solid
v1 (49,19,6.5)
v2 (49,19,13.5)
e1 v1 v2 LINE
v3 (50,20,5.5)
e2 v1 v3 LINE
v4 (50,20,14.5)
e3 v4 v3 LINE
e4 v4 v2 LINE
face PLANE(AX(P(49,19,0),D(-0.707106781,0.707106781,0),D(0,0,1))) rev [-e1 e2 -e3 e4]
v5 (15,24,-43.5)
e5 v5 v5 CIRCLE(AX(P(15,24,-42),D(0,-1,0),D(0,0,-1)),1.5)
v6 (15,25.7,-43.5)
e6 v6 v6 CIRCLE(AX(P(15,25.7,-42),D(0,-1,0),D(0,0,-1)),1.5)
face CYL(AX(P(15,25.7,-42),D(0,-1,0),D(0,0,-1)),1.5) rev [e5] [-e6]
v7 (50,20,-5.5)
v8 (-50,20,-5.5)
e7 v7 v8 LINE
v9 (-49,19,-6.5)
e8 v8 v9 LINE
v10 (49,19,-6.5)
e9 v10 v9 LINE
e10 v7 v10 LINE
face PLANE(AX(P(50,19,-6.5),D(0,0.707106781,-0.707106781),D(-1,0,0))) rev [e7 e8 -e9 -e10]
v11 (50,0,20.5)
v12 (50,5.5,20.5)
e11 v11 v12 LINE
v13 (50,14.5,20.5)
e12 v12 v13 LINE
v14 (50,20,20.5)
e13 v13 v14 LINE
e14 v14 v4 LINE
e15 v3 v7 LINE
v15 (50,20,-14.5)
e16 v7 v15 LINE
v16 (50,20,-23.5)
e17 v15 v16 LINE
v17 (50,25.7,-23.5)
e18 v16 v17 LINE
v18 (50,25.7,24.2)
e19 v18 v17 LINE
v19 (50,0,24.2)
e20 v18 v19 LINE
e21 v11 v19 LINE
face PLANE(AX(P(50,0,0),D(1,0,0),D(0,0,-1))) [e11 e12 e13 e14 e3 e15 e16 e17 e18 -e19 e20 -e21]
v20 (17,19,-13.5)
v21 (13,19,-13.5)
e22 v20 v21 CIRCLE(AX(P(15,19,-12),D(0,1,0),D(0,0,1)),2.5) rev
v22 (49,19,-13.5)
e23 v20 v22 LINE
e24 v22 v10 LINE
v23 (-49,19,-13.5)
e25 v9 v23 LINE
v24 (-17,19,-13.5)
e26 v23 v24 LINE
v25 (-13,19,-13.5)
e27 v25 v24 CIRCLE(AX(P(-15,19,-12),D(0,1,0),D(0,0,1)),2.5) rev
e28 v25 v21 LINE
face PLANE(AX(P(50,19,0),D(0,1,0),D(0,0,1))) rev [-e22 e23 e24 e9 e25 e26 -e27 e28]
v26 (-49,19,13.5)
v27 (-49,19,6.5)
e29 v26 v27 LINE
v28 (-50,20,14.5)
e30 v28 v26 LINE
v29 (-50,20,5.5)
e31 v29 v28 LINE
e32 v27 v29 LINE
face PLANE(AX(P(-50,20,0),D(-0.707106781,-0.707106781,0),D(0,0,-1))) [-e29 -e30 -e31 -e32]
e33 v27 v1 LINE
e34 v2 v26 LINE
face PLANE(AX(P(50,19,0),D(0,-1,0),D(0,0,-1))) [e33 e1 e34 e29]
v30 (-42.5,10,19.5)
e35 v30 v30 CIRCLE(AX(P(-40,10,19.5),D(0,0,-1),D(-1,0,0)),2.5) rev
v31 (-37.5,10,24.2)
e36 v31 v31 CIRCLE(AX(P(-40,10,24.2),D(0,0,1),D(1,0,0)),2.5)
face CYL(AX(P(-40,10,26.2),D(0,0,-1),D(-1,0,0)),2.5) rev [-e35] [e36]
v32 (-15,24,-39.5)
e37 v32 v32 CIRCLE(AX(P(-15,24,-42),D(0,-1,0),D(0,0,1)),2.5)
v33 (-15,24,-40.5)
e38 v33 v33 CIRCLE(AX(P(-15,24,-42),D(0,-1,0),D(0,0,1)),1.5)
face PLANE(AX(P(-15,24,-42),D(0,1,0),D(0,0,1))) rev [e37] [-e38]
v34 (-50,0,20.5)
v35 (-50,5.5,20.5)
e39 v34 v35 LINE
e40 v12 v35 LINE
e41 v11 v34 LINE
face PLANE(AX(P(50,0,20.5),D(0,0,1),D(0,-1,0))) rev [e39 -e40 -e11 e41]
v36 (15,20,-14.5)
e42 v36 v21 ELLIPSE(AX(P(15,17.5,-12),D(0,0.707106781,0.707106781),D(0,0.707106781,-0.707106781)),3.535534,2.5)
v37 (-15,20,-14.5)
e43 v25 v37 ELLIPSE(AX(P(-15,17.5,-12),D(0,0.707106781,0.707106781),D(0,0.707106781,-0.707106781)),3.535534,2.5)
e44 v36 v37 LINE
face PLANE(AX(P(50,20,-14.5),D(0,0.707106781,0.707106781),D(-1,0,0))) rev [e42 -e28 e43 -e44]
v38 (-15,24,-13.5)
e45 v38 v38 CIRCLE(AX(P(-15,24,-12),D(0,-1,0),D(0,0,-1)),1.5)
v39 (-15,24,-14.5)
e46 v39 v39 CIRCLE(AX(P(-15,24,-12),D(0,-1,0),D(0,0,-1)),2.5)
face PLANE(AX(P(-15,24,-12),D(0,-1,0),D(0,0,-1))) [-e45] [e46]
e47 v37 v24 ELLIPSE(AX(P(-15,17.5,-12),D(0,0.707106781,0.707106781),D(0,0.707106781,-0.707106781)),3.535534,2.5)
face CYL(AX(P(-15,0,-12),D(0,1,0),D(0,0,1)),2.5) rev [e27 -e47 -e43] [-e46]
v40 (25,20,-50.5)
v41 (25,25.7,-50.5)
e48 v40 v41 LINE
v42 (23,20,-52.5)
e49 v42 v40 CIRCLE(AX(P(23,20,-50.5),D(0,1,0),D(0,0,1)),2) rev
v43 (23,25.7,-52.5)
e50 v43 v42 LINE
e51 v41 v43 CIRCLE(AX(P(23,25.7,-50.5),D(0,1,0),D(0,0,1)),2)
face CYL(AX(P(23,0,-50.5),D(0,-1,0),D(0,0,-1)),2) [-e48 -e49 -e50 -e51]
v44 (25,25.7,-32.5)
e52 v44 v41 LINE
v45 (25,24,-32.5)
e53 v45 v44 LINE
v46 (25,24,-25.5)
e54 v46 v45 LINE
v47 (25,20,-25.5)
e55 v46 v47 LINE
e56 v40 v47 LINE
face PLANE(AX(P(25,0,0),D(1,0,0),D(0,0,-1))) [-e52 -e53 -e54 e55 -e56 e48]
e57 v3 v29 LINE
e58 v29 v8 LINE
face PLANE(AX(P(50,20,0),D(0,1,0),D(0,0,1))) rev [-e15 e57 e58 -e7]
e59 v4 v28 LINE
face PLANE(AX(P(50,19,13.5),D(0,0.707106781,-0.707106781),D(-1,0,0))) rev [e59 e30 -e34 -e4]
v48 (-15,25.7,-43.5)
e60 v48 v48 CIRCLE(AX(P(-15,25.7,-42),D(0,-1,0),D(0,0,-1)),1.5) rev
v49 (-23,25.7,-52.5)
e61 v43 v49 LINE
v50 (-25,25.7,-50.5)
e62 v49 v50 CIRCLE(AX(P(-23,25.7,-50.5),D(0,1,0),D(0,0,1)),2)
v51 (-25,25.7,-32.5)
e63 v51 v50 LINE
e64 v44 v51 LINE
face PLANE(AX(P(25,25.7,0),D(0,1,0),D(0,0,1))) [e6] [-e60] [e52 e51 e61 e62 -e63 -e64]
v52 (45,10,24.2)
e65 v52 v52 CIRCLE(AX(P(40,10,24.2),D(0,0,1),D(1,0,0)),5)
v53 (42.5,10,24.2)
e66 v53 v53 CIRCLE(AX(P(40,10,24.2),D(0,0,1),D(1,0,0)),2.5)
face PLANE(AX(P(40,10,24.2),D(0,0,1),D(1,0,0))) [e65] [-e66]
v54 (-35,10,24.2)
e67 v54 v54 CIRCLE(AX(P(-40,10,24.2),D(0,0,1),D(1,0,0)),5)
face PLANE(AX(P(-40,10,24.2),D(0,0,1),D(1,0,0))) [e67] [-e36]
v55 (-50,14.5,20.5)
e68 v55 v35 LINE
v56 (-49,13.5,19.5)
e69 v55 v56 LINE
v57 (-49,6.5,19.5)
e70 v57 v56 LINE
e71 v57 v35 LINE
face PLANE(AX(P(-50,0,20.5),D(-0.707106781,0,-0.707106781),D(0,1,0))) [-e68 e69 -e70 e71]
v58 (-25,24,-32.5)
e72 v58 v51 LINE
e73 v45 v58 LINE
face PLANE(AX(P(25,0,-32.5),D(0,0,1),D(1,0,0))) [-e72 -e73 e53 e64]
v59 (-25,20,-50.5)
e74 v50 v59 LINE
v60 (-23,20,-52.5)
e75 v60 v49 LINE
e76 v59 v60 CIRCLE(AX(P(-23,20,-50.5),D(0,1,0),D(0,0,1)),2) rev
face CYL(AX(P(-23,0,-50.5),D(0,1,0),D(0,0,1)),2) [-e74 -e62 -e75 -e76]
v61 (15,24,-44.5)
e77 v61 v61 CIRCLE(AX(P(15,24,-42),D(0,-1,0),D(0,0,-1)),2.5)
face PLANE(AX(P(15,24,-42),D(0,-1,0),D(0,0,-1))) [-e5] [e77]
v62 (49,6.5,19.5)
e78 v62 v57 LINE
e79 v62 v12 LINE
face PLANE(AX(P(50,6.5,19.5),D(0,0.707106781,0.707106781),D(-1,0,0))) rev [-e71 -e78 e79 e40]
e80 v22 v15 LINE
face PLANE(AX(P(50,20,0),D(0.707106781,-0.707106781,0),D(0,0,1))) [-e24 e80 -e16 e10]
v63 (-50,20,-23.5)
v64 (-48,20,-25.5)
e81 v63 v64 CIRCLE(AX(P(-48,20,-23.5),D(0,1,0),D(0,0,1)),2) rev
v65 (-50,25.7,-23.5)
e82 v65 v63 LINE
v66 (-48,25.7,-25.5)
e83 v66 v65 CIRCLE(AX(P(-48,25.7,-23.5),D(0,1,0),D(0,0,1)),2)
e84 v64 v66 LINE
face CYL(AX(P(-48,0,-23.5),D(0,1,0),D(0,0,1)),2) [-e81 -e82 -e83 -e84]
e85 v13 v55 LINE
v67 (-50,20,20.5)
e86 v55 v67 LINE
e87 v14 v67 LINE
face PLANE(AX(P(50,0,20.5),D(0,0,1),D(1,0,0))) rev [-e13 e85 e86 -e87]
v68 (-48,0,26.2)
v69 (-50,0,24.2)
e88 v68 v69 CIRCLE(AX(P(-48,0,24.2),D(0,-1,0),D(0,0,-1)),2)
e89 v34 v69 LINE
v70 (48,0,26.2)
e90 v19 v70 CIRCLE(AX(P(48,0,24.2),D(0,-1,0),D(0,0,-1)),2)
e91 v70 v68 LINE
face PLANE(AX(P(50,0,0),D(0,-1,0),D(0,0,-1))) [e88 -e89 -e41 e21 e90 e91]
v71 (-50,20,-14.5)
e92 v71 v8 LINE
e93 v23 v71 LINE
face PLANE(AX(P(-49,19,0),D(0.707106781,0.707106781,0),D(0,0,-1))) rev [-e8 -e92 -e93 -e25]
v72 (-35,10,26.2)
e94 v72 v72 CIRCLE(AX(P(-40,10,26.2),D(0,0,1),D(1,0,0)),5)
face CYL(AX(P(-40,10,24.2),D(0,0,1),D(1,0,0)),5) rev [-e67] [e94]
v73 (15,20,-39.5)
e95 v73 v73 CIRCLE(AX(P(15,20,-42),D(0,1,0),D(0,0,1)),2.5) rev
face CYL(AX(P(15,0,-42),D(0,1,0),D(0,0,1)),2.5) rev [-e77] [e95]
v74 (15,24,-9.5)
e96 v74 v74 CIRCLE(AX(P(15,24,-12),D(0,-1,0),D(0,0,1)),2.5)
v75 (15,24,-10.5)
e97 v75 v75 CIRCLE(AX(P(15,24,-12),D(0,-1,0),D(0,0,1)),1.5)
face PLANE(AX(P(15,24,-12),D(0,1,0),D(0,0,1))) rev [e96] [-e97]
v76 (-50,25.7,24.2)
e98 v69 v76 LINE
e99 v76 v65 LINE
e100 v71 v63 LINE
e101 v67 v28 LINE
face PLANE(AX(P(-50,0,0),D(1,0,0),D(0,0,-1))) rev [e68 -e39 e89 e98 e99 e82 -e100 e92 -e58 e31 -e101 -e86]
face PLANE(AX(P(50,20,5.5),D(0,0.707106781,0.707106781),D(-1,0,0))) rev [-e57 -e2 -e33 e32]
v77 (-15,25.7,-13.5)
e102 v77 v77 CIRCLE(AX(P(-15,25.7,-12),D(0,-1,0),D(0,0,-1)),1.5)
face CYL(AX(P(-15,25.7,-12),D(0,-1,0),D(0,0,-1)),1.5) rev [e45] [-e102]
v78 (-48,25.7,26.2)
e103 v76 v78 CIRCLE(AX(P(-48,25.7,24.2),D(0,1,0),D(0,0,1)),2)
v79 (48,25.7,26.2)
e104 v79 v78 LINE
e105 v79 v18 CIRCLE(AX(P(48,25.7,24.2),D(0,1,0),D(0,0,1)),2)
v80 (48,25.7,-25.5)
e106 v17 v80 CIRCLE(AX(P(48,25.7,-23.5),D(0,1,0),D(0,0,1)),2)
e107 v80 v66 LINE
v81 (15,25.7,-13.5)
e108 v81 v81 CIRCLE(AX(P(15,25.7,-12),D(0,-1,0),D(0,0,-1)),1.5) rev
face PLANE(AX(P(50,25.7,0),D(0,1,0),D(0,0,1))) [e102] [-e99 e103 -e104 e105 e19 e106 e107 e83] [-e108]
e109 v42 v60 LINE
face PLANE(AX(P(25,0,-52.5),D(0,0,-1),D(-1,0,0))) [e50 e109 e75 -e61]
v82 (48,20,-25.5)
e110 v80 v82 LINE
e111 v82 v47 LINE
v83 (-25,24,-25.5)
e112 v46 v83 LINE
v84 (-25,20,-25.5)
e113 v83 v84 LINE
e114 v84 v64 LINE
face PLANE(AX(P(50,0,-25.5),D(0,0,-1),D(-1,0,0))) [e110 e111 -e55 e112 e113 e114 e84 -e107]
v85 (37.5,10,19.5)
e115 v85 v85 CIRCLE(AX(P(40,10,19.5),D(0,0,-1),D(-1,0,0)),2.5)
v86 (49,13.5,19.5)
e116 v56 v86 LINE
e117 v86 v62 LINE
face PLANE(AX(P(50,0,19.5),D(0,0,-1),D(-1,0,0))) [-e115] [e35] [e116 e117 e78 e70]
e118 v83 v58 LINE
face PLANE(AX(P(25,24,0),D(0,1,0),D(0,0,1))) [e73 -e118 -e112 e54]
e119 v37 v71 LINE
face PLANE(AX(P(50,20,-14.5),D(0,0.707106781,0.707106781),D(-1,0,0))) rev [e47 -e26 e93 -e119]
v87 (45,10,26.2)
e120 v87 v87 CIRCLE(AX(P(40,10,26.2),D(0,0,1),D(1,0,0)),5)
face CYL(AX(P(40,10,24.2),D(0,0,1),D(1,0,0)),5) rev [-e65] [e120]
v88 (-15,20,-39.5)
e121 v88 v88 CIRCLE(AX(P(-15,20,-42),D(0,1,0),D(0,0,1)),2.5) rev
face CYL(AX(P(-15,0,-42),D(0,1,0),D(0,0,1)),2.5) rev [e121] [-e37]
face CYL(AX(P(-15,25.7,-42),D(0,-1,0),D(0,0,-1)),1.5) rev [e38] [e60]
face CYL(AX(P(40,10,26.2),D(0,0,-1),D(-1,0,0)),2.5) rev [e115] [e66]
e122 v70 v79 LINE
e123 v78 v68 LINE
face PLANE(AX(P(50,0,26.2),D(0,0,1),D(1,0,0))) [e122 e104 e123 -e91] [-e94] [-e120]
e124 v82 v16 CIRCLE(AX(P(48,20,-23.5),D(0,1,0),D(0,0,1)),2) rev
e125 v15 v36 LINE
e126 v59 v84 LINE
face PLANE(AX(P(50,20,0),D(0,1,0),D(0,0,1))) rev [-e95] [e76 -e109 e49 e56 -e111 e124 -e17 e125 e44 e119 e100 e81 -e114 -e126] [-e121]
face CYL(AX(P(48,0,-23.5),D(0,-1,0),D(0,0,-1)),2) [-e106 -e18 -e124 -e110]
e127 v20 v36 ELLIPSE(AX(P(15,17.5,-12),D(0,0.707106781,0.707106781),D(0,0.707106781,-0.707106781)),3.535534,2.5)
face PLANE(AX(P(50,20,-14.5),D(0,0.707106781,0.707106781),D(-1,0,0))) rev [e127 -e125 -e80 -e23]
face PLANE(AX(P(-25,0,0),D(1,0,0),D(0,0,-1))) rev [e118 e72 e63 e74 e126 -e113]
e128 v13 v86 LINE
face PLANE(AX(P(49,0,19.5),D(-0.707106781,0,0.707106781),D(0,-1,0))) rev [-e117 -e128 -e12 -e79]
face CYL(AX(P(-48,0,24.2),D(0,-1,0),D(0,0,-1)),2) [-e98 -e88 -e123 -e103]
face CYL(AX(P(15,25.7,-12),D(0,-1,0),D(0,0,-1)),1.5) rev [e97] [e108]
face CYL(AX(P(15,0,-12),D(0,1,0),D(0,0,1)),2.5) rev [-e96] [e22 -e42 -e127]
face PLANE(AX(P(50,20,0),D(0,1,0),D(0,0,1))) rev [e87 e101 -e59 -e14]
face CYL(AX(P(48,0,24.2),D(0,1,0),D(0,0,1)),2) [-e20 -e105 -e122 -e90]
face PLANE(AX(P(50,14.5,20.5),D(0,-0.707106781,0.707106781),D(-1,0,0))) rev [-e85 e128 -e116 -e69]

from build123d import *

# Parameters (mm, degrees)
BOSS_EXTRUDE1_DEPTH     = 50
BOSS_EXTRUDE2_DEPTH     = 25
CHAMFER1_SIZE           = 1
CUT_EXTRUDE1_DEPTH      = 76.208044782
CUT_EXTRUDE1_DEPTH_BACK = 76.208044782
SKETCH2_R               = 1.5
CUT_EXTRUDE2_DEPTH      = 76.208044782
CUT_EXTRUDE2_DEPTH_BACK = 4
SKETCH2_3_R             = 2.5
SKETCH2_3_R_2           = 1.5
CUT_EXTRUDE3_DEPTH      = 92.348180058
CUT_EXTRUDE3_DEPTH_BACK = 92.348180058
SKETCH3_R               = 2.5
CUT_EXTRUDE4_START      = -4.7
SKETCH3_3_R             = 5
SKETCH3_3_R_2           = 2.5
CUT_EXTRUDE4_DEPTH      = 2
FILLET1_R               = 2


with BuildPart() as part:
    # Sketch1 → Boss-Extrude1 (new, symmetric)
    with BuildSketch(Plane(origin=(0, 0, 0), x_dir=(0, 0, -1), z_dir=(1, 0, 0))):
        Polygon((25.5, 25.7), (25.5, 20), (14.5, 20), (14.5, 19), (5.5, 19), (5.5, 20), (-5.5, 20), (-5.5, 19), (-14.5, 19), (-14.5, 20), (-20.5, 20), (-20.5, 14.5), (-19.5, 14.5), (-19.5, 5.5), (-20.5, 5.5), (-20.5, 0), (-26.2, 0), (-26.2, 25.7), align=None)
    extrude(amount=BOSS_EXTRUDE1_DEPTH, both=True)

    # Sketch1<3> → Boss-Extrude2 (add, symmetric)
    with BuildSketch(Plane(origin=(0, 0, 0), x_dir=(0, 0, -1), z_dir=(1, 0, 0))):
        Polygon((32.5, 24), (25.5, 24), (25.5, 20), (52.5, 20), (52.5, 25.7), (32.5, 25.7), align=None)
    extrude(amount=BOSS_EXTRUDE2_DEPTH, both=True)

    # Chamfer1
    chamfer1_edges = [part.edges().sort_by_distance(p)[0] for p in [
        (0, 5.5, 19.5),
        (0, 14.5, 19.5),
        (0, 19, 14.5),
        (0, 19, 5.5),
        (0, 19, -5.5),
        (0, 19, -14.5),
        (-50, 10, 19.5),
        (50, 10, 19.5),
        (50, 19, 10),
        (-50, 19, 10),
        (50, 19, -10),
        (-50, 19, -10),
    ]]
    chamfer(chamfer1_edges, length=CHAMFER1_SIZE - 0.0001)  # a hair under: the kernel refuses the full size

    # Sketch2 → Cut-Extrude1 (cut, two sides: drawn at the far end of the back side and taken through both)
    with BuildSketch(Plane.XZ.offset(-20).offset(-CUT_EXTRUDE1_DEPTH_BACK)):
        with Locations(Location((-15, -42, 0), (0, 0, 270))):
            Circle(SKETCH2_R)
        with Locations(Location((15, -42, 0), (0, 0, 270))):
            Circle(SKETCH2_R)
        with Locations(Location((-15, -12, 0), (0, 0, 270))):
            Circle(SKETCH2_R)
        with Locations(Location((15, -12, 0), (0, 0, 270))):
            Circle(SKETCH2_R)
    extrude(amount=CUT_EXTRUDE1_DEPTH + CUT_EXTRUDE1_DEPTH_BACK, mode=Mode.SUBTRACT)

    # Sketch2<3> → Cut-Extrude2 (cut, two sides: drawn at the far end of the back side and taken through both)
    # profile 1 of 4: a face of its own
    with BuildSketch(Plane.XZ.offset(-20).offset(-CUT_EXTRUDE2_DEPTH_BACK)):
        with Locations(Location((-15, -12, 0), (0, 0, 270))):
            Circle(SKETCH2_3_R)
        with Locations(Location((-15, -12, 0), (0, 0, 270))):
            Circle(SKETCH2_3_R_2, mode=Mode.SUBTRACT)
    # profile 2 of 4: a face of its own
    with BuildSketch(Plane.XZ.offset(-20).offset(-CUT_EXTRUDE2_DEPTH_BACK)):
        with Locations(Location((-15, -42, 0), (0, 0, 90))):
            Circle(SKETCH2_3_R)
        with Locations(Location((-15, -42, 0), (0, 0, 270))):
            Circle(SKETCH2_3_R_2, mode=Mode.SUBTRACT)
    # profile 3 of 4: a face of its own
    with BuildSketch(Plane.XZ.offset(-20).offset(-CUT_EXTRUDE2_DEPTH_BACK)):
        with Locations(Location((15, -42, 0), (0, 0, 90))):
            Circle(SKETCH2_3_R)
        with Locations(Location((15, -42, 0), (0, 0, 270))):
            Circle(SKETCH2_3_R_2, mode=Mode.SUBTRACT)
    # profile 4 of 4: a face of its own
    with BuildSketch(Plane.XZ.offset(-20).offset(-CUT_EXTRUDE2_DEPTH_BACK)):
        with Locations(Location((15, -12, 0), (0, 0, 90))):
            Circle(SKETCH2_3_R)
        with Locations(Location((15, -12, 0), (0, 0, 270))):
            Circle(SKETCH2_3_R_2, mode=Mode.SUBTRACT)
    extrude(amount=CUT_EXTRUDE2_DEPTH + CUT_EXTRUDE2_DEPTH_BACK, mode=Mode.SUBTRACT)

    # Sketch3 → Cut-Extrude3 (cut, two sides: drawn at the far end of the back side and taken through both)
    with BuildSketch(Plane(origin=(0, 0, 19.5), x_dir=(-1, 0, 0), z_dir=(0, 0, -1)).offset(-CUT_EXTRUDE3_DEPTH_BACK)):
        with Locations((-40, 10)):
            Circle(SKETCH3_R)
        with Locations((40, 10)):
            Circle(SKETCH3_R)
    extrude(amount=CUT_EXTRUDE3_DEPTH + CUT_EXTRUDE3_DEPTH_BACK, mode=Mode.SUBTRACT)

    # Sketch3<3> → Cut-Extrude4 (cut)
    # profile 1 of 2: a face of its own
    with BuildSketch(Plane(origin=(0, 0, 19.5), x_dir=(-1, 0, 0), z_dir=(0, 0, -1)).offset(CUT_EXTRUDE4_START)):
        with Locations(Location((-40, 10, 0), (0, 0, 180))):
            Circle(SKETCH3_3_R)
        with Locations((-40, 10)):
            Circle(SKETCH3_3_R_2, mode=Mode.SUBTRACT)
    # profile 2 of 2: a face of its own
    with BuildSketch(Plane(origin=(0, 0, 19.5), x_dir=(-1, 0, 0), z_dir=(0, 0, -1)).offset(CUT_EXTRUDE4_START)):
        with Locations(Location((40, 10, 0), (0, 0, 180))):
            Circle(SKETCH3_3_R)
        with Locations((40, 10)):
            Circle(SKETCH3_3_R_2, mode=Mode.SUBTRACT)
    extrude(amount=-CUT_EXTRUDE4_DEPTH, mode=Mode.SUBTRACT)

    # Fillet1
    fillet1_edges = [part.edges().sort_by_distance(p)[0] for p in [
        (50, 12.85, 26.2),
        (-50, 12.85, 26.2),
        (-50, 22.85, -25.5),
        (50, 22.85, -25.5),
        (25, 22.85, -52.5),
        (-25, 22.85, -52.5),
    ]]
    fillet(fillet1_edges, radius=FILLET1_R)


solid = part.part
